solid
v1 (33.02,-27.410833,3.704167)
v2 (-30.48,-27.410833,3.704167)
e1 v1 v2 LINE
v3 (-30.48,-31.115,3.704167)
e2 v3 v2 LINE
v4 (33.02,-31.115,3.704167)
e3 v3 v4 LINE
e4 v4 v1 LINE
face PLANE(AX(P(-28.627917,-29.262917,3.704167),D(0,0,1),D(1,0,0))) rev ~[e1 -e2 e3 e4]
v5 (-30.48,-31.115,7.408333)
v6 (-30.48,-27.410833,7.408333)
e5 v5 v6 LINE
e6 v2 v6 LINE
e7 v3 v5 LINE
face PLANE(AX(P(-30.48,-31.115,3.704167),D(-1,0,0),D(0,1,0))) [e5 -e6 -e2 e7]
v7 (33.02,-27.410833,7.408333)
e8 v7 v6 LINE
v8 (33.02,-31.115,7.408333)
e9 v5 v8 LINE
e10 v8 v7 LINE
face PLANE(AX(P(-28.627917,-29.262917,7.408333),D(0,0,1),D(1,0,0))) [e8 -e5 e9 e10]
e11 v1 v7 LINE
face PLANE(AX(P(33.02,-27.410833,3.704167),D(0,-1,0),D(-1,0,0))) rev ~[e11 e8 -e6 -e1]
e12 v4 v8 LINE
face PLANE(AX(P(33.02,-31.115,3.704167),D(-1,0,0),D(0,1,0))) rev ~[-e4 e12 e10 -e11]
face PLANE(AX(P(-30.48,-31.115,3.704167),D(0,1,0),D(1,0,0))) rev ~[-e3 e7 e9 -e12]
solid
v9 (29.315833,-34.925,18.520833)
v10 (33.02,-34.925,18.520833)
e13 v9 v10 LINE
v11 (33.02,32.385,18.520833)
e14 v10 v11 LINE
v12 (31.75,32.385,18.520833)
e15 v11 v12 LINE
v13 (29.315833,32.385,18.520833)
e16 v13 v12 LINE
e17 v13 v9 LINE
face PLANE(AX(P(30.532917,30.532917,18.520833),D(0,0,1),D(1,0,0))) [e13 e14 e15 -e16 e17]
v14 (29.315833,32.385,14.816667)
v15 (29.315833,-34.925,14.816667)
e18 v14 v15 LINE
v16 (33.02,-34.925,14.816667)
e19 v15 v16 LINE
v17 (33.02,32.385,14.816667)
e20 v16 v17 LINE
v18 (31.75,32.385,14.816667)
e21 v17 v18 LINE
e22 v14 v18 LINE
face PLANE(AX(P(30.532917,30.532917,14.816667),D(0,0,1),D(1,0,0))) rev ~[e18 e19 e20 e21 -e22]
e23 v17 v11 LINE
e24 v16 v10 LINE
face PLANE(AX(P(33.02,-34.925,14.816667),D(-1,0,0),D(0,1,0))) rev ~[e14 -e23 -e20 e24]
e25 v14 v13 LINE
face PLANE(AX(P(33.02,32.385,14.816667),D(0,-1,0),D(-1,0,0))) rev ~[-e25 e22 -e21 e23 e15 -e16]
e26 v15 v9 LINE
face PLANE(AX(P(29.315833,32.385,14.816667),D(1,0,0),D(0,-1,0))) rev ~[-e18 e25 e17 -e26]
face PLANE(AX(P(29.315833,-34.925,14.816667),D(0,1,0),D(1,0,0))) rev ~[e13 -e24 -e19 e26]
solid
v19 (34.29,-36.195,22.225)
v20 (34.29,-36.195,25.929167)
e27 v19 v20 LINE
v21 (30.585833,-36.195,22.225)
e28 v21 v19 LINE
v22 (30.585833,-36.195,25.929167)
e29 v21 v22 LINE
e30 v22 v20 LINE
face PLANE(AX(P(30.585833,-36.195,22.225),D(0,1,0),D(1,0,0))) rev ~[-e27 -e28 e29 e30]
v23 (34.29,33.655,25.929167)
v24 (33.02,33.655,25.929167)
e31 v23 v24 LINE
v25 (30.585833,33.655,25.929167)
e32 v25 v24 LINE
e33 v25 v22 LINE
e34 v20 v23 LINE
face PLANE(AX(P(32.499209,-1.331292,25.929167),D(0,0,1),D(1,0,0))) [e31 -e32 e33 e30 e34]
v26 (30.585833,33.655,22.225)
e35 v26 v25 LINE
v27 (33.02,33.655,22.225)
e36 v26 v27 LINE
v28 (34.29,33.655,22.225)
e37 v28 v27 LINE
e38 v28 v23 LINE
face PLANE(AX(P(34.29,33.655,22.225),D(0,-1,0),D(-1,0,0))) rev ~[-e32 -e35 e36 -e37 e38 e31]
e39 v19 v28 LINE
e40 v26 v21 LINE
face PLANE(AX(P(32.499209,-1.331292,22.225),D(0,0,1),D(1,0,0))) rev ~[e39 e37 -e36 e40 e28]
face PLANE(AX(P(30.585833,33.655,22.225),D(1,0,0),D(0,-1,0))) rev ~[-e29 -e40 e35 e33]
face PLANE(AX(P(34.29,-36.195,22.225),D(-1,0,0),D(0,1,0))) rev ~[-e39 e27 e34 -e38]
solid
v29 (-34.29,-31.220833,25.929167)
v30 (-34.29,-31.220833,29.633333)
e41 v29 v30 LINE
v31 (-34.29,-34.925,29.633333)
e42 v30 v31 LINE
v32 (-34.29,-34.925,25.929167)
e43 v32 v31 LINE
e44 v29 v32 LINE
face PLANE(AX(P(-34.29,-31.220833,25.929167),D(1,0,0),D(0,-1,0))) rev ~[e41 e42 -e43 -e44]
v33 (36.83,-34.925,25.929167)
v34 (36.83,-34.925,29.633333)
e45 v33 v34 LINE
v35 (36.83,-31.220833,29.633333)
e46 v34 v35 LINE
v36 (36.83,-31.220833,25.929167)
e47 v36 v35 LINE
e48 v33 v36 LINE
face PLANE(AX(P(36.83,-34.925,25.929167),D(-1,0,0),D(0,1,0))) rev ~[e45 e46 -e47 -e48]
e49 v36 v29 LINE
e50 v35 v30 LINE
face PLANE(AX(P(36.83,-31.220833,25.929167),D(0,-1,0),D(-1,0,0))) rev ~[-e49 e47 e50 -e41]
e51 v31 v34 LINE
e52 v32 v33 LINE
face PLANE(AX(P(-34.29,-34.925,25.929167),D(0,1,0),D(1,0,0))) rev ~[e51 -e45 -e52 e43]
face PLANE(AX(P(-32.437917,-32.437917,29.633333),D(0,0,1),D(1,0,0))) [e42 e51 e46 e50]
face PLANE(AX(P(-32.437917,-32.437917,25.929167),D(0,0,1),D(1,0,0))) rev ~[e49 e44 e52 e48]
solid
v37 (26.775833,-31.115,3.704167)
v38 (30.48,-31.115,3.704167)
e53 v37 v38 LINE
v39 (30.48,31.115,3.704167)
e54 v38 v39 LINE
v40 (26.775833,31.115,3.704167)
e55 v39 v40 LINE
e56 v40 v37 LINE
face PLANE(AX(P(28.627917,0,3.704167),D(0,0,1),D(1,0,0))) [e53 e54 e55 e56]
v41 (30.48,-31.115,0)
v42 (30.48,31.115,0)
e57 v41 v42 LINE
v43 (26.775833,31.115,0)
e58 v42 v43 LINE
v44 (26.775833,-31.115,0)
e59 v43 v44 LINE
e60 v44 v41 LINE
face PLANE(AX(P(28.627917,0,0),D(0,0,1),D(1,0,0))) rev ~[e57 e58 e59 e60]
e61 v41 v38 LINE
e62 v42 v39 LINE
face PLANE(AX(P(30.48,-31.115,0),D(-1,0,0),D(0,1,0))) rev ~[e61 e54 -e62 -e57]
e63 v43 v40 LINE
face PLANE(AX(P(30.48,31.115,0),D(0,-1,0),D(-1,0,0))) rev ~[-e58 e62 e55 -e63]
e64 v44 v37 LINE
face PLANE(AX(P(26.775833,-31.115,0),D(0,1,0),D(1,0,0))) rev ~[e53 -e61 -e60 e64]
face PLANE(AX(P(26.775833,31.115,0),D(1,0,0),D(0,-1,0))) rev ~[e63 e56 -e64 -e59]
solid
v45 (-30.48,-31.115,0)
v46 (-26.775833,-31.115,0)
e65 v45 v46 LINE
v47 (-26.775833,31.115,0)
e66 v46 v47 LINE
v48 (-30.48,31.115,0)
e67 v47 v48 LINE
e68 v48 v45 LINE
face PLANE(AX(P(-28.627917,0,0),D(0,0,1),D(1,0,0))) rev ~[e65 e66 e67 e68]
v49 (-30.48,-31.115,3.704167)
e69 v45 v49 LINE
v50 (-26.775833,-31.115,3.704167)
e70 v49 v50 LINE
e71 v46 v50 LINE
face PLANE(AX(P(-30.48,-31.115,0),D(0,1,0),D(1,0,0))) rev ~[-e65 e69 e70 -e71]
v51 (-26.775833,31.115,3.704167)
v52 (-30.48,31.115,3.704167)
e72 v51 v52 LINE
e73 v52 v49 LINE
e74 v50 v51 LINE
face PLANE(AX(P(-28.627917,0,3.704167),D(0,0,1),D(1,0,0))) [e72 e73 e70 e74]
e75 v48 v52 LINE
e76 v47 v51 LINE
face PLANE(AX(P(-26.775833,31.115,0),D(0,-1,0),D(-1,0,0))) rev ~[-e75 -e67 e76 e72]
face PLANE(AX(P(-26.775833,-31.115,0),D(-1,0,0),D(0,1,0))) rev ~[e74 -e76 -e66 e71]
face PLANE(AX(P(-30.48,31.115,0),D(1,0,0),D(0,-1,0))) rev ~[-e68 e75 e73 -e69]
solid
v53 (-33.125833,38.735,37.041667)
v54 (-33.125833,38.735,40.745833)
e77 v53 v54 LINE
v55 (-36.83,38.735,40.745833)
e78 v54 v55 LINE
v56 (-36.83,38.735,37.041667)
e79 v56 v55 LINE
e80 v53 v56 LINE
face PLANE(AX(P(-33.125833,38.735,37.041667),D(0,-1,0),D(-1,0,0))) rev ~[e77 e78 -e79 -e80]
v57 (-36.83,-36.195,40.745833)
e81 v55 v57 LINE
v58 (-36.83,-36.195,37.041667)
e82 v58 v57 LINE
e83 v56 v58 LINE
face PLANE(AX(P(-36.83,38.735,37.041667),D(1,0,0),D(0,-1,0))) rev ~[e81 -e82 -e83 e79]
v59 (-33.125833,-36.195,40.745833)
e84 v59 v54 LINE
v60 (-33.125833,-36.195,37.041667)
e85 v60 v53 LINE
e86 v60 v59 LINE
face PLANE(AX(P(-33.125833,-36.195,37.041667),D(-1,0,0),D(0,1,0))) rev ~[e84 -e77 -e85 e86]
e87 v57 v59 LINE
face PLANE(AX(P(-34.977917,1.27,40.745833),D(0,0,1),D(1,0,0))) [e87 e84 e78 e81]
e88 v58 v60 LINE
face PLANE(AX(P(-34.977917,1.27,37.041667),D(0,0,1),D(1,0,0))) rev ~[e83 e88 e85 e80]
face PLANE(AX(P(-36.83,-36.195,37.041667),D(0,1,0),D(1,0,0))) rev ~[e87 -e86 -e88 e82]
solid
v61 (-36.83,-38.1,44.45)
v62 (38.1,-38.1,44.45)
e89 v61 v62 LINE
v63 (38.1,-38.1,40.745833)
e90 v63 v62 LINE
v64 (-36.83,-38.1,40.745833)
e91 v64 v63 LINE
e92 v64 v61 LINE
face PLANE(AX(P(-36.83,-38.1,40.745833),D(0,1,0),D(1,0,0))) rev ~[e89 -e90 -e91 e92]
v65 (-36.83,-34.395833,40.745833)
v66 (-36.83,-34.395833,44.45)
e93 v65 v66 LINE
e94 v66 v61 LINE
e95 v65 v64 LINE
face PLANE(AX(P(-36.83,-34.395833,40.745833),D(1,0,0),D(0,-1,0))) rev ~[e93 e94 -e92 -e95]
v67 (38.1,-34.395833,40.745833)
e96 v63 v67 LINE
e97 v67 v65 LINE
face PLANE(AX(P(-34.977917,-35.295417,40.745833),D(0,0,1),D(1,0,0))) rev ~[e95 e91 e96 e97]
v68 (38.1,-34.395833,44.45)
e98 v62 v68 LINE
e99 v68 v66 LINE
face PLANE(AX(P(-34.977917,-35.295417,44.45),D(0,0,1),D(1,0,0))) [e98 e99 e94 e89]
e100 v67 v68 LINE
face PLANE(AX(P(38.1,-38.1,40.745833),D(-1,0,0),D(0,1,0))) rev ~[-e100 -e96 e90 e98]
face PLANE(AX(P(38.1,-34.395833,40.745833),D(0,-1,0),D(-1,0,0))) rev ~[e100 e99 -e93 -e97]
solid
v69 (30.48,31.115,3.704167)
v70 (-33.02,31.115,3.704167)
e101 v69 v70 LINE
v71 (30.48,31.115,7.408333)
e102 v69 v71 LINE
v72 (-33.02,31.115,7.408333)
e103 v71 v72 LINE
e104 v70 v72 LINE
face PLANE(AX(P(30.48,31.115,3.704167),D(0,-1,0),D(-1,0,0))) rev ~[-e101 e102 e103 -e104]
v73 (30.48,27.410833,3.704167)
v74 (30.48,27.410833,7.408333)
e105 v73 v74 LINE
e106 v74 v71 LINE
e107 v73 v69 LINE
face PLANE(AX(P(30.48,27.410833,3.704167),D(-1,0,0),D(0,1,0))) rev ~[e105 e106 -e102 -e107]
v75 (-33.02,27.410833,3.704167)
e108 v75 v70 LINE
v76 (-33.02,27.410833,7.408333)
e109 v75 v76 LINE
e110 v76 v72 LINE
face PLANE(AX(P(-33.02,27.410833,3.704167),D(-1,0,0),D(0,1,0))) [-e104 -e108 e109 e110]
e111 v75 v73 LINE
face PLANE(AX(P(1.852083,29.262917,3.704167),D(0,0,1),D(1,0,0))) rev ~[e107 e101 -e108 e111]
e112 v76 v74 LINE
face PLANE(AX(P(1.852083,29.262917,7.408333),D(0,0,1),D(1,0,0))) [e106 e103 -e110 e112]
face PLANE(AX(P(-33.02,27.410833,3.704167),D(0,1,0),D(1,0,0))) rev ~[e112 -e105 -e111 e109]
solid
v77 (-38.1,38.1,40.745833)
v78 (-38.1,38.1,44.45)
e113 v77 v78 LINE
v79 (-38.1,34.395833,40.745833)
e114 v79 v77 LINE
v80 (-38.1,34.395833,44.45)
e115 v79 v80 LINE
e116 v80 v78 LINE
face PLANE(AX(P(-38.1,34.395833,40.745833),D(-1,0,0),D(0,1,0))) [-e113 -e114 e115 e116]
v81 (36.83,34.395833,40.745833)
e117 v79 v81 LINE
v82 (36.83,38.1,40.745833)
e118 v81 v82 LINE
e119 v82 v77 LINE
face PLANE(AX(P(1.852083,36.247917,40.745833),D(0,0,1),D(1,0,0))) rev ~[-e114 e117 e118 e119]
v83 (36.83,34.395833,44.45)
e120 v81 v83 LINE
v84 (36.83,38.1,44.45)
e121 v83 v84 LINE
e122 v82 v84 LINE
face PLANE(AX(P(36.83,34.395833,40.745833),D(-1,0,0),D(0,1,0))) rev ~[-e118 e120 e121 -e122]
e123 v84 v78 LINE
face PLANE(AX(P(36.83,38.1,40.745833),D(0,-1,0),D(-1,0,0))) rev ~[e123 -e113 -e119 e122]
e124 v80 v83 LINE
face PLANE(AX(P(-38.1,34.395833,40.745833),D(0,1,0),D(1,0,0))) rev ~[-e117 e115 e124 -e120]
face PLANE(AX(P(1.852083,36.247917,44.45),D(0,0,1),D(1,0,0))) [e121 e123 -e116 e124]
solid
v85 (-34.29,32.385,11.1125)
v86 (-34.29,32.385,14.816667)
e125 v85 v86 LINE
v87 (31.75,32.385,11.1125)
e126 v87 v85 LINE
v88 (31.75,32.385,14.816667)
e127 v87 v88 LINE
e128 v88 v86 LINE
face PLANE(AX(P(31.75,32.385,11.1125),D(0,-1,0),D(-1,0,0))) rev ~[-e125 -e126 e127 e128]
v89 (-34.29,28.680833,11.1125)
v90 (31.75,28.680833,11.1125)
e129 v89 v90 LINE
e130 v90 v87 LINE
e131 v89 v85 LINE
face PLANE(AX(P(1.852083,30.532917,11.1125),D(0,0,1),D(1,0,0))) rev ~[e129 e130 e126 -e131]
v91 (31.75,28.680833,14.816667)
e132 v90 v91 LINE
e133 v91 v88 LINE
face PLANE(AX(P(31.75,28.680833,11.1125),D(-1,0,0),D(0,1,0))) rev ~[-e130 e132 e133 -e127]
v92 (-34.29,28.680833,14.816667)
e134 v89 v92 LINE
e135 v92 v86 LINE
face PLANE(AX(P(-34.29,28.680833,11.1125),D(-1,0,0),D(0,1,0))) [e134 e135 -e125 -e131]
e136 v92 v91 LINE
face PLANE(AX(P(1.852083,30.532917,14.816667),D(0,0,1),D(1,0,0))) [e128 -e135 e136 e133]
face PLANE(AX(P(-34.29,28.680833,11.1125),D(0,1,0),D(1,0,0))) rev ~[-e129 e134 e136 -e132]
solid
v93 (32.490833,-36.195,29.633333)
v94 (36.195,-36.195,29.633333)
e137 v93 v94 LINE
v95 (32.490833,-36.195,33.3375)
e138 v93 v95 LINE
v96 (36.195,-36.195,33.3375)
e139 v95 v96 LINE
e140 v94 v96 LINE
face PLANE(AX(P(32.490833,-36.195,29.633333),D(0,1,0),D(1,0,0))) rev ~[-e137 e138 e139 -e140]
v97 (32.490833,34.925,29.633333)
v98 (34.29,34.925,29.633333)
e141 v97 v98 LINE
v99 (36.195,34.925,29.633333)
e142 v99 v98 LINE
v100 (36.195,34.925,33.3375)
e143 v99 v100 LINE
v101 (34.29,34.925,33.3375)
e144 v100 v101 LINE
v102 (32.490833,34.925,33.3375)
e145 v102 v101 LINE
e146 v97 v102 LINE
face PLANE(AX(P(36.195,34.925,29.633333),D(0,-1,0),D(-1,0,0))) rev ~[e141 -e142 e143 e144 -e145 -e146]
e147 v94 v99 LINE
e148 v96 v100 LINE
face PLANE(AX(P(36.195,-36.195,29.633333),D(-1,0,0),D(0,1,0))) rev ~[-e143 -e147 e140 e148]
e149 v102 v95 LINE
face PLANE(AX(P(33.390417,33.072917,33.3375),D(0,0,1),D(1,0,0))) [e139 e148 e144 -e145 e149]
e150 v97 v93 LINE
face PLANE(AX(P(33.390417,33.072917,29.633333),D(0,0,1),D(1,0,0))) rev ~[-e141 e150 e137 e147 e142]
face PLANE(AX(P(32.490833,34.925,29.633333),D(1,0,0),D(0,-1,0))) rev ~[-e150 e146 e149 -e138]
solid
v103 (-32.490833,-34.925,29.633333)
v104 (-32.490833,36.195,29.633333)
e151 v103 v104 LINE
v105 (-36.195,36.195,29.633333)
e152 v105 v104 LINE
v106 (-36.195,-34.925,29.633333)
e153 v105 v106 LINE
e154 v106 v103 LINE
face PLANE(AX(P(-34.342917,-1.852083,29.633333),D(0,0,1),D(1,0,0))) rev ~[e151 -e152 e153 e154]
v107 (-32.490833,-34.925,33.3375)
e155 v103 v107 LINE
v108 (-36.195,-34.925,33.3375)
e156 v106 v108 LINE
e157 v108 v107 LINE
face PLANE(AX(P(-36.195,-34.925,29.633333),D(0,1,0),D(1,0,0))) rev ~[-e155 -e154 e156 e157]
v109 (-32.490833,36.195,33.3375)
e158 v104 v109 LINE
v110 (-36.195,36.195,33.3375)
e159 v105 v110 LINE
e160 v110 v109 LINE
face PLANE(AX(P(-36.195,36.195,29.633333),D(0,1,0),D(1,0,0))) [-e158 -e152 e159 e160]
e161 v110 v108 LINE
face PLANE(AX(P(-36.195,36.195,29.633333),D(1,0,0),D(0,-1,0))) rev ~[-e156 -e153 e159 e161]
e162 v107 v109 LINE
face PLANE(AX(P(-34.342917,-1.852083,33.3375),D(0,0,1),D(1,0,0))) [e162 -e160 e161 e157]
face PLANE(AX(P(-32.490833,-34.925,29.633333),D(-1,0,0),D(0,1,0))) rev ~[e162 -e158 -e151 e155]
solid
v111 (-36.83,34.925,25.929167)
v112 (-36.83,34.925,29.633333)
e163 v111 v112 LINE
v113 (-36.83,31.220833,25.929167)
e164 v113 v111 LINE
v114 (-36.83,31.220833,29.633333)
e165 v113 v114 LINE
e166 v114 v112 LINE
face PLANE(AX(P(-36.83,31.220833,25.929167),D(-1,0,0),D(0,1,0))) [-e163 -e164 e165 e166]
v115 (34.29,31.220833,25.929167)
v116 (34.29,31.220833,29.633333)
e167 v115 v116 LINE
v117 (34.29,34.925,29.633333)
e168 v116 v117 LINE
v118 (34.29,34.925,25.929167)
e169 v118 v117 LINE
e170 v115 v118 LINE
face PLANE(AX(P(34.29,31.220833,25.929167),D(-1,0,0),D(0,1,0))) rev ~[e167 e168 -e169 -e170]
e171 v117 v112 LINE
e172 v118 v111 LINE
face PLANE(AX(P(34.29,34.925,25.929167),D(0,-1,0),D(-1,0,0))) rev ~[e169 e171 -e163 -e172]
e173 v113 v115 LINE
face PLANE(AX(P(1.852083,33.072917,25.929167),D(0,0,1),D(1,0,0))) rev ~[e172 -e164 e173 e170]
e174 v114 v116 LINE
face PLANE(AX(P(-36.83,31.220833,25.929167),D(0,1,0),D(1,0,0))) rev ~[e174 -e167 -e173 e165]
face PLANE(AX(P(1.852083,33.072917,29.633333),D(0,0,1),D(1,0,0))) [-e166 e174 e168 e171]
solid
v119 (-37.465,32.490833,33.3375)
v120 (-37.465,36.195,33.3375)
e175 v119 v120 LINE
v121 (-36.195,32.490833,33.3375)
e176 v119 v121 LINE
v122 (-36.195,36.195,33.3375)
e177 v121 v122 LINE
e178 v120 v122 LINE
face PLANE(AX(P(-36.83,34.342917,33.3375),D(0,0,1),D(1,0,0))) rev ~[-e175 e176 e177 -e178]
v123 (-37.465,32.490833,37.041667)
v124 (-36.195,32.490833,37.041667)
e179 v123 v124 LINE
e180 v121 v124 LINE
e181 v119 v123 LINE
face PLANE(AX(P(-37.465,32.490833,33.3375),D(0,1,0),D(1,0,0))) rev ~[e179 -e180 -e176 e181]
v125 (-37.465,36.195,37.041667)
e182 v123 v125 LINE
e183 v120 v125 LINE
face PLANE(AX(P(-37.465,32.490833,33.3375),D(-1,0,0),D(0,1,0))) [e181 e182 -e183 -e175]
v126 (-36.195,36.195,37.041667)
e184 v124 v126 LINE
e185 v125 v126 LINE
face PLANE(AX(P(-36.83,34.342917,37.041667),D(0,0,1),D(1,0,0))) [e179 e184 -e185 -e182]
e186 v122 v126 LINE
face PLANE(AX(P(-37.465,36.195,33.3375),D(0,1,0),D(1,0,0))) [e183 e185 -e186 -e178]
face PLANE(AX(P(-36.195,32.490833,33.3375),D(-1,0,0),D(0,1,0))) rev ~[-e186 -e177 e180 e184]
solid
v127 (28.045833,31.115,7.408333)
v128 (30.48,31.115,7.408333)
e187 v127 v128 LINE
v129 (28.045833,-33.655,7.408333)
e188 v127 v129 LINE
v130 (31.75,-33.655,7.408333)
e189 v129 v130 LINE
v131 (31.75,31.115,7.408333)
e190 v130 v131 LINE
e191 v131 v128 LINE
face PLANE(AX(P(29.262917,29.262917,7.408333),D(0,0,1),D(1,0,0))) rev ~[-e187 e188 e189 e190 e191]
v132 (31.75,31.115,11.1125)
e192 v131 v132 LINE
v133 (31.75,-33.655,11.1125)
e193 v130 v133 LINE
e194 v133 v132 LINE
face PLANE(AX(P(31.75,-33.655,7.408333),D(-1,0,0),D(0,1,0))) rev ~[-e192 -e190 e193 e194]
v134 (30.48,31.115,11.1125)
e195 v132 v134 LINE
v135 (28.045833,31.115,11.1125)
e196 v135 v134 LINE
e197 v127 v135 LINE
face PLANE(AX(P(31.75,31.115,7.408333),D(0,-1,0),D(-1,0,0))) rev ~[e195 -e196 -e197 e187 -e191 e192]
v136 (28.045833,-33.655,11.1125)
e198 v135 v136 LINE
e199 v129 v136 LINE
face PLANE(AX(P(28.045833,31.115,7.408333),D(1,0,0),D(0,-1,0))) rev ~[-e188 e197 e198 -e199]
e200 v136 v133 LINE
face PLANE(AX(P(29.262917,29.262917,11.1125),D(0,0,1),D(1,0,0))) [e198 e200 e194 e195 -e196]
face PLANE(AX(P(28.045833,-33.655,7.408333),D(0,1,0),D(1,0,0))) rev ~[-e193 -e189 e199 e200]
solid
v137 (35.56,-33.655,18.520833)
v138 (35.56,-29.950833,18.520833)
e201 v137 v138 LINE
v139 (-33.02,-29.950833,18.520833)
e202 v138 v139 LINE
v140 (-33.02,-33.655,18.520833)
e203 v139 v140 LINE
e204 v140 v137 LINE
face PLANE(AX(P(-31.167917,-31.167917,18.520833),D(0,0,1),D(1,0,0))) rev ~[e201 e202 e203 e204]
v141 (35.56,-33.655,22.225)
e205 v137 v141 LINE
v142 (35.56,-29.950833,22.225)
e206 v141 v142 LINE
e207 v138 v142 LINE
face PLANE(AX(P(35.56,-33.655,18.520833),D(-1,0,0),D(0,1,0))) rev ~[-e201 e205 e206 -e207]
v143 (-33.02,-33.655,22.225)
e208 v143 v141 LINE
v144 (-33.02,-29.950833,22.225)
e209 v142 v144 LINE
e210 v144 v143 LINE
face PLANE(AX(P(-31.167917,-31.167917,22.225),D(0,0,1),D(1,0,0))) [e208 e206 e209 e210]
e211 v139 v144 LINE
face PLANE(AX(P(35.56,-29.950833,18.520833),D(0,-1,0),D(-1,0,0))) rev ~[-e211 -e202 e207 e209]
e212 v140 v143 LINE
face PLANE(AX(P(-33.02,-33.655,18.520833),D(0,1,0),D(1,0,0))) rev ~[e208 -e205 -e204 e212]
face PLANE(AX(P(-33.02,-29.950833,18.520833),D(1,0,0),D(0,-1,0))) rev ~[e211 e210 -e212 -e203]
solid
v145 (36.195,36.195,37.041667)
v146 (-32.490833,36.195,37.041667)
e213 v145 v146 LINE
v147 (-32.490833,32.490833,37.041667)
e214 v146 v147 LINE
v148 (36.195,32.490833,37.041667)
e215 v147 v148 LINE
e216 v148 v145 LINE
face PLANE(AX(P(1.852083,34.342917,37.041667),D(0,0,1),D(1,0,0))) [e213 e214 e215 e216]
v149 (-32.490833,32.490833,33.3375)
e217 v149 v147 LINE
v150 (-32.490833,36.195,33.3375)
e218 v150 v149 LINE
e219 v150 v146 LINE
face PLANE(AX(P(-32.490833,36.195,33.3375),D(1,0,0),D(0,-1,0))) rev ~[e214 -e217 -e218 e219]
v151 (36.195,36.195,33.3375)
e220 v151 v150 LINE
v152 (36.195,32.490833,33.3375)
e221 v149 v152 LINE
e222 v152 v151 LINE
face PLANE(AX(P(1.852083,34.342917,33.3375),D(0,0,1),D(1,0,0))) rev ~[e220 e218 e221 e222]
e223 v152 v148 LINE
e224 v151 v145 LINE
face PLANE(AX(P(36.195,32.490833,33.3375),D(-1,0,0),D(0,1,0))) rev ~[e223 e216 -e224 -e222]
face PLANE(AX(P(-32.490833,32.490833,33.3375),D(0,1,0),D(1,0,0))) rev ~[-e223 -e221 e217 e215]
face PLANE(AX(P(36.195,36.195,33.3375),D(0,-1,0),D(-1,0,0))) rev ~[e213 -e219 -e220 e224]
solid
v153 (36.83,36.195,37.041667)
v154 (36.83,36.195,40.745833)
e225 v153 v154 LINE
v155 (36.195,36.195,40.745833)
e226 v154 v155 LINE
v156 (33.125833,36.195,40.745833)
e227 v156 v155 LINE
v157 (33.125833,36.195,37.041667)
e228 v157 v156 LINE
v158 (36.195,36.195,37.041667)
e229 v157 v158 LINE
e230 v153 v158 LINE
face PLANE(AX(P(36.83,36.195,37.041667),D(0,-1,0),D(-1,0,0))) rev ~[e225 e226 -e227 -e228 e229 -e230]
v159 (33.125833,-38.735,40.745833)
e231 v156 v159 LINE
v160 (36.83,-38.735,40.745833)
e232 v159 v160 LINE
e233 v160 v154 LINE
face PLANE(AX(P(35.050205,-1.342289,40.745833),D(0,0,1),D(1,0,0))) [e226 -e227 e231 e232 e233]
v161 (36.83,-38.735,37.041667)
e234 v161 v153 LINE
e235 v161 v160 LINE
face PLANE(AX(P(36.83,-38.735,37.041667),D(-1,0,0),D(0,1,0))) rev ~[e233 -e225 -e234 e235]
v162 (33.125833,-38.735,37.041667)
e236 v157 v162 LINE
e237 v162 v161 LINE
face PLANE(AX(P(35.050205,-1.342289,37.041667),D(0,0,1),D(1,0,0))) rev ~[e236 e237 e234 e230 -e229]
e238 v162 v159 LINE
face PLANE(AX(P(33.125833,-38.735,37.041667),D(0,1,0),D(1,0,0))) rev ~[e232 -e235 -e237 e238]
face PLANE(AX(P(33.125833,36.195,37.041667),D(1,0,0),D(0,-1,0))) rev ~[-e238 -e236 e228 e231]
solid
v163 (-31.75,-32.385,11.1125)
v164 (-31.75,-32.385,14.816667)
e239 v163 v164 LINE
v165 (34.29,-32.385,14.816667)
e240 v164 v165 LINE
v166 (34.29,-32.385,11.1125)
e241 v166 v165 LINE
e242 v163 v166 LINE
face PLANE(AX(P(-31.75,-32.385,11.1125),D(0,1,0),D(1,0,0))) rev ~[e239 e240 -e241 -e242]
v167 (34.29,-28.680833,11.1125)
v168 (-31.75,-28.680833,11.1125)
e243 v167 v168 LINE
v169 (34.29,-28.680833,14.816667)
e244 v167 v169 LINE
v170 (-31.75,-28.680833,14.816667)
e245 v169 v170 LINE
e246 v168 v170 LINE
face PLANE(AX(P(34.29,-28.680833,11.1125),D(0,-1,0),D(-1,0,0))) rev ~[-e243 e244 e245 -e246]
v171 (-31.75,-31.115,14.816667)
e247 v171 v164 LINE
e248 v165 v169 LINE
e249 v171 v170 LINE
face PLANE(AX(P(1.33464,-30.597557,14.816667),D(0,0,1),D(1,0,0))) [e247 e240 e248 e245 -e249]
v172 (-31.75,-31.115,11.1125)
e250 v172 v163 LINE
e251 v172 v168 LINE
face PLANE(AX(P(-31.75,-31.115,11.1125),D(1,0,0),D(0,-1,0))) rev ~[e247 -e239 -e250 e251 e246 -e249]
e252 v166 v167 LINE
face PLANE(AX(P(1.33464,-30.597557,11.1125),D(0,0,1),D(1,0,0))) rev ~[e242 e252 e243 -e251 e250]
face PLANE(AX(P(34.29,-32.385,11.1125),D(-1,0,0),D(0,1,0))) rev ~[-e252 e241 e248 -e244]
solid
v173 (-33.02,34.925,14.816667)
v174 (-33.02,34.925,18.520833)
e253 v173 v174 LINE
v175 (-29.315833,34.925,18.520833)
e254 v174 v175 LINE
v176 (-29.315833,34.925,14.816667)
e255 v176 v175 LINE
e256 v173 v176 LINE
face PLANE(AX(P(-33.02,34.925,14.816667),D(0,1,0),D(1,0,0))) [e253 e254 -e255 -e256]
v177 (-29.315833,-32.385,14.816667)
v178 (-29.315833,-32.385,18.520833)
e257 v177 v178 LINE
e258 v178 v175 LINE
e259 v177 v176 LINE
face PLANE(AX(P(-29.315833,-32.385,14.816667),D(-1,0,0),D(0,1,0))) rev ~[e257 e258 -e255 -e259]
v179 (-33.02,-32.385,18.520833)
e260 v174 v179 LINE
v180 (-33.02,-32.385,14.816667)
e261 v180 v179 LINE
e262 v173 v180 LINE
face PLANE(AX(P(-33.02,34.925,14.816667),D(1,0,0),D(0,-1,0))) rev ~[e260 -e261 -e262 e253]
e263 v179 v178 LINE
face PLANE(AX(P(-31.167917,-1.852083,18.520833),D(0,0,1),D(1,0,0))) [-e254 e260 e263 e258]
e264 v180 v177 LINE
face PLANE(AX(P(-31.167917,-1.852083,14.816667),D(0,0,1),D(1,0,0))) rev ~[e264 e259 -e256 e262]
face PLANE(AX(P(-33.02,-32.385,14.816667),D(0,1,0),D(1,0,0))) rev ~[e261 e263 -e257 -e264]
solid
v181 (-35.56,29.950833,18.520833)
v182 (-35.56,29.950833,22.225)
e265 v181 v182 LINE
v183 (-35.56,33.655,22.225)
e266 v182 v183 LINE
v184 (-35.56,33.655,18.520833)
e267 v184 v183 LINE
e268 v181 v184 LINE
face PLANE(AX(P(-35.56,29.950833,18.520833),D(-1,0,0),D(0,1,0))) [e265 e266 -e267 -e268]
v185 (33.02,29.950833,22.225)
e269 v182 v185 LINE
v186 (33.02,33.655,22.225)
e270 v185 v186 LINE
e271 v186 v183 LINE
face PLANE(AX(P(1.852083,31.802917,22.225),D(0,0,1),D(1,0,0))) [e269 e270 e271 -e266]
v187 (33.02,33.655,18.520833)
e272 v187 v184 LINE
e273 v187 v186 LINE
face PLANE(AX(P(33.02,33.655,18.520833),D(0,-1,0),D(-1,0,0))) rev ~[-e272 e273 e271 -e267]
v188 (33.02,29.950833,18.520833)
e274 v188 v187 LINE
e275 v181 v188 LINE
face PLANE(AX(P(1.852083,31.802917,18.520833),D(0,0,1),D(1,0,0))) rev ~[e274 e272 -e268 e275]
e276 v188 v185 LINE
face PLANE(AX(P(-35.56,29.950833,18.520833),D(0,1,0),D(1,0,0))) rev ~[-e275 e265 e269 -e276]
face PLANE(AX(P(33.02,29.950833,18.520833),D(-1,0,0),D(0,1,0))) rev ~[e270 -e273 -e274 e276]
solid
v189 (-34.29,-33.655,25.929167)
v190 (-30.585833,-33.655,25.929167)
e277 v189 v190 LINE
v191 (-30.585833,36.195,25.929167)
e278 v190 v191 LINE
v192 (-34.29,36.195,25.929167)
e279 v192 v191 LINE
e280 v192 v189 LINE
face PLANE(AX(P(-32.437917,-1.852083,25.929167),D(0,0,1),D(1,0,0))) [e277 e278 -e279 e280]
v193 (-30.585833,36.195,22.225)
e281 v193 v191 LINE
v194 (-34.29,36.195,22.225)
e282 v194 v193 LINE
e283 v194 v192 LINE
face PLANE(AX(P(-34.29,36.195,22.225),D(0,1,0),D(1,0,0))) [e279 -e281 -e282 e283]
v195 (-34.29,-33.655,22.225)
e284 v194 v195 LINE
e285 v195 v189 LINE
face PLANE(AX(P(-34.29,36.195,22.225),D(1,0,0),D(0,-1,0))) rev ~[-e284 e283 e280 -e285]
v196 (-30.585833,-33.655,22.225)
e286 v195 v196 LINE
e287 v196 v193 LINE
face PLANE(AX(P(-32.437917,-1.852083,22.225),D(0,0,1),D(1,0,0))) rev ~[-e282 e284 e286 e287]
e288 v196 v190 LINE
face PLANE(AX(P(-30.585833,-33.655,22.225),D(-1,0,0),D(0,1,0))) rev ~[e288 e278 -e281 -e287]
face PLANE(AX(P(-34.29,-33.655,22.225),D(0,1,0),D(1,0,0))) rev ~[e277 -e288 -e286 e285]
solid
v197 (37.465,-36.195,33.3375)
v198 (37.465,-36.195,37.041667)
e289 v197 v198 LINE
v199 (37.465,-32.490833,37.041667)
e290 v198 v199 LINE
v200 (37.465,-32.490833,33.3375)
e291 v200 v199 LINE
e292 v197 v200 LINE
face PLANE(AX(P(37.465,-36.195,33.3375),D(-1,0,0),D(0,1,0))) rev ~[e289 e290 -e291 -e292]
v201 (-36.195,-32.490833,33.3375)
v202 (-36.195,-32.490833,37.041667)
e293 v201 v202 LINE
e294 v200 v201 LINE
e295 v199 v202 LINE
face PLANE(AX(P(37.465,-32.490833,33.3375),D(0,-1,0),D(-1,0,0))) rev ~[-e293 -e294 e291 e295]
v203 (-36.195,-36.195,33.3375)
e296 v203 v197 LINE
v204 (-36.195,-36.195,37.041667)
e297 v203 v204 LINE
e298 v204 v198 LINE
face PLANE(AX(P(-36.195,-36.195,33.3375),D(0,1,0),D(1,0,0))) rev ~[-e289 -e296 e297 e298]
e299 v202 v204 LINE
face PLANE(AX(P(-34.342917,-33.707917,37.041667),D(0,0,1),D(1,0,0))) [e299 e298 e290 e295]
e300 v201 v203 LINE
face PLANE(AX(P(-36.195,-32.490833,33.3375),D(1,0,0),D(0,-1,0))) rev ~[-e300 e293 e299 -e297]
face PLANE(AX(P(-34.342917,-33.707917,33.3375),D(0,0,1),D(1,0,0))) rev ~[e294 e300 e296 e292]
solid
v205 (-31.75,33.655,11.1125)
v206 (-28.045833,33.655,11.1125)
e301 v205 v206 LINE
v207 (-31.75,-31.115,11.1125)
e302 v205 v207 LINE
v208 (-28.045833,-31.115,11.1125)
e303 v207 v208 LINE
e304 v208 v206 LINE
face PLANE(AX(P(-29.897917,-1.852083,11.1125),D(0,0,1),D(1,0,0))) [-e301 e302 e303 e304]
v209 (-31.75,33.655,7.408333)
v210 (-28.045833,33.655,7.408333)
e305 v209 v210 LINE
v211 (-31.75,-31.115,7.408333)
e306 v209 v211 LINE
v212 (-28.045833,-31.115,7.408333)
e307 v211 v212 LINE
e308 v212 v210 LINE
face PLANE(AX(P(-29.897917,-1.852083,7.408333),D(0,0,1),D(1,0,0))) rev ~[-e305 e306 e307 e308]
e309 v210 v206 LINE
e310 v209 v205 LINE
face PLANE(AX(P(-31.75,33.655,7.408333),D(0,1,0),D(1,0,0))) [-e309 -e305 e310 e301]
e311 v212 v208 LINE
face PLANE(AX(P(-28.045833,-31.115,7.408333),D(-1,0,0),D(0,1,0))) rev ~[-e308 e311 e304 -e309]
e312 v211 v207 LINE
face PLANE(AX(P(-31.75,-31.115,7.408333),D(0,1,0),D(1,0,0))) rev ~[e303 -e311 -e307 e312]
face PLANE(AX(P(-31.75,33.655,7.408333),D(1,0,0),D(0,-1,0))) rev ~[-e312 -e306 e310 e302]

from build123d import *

# Parameters (mm, degrees)
F1_DEPTH  = 3.7041666667
F2_W      = 2.54
F2_H      = 3.7041666667
F2_W_2    = 3.7041666667
F3_DEPTH  = 3.7041666667
F4_W      = 3.7041666667
F4_H      = 2.54
F4_H_2    = 3.7041666667
F5_DEPTH  = 3.7041666667
F4_W_2    = 2.4341666667
F6_W      = 3.7041666667
F6_H      = 2.4341666667
F7_DEPTH  = 3.7041666667
F6_H_2    = 3.7041666667
F6_W_2    = 2.54
F8_W      = 3.7041666667
F8_H      = 2.54
F8_H_2    = 3.7041666667
F9_DEPTH  = 3.7041666667
F8_W_2    = 2.4341666667
F10_W     = 3.7041666667
F10_H     = 3.7041666667
F10_W_2   = 2.54
F11_DEPTH = 3.7041666667
F10_H_2   = 2.4341666667
F12_W     = 3.7041666667
F12_H     = 3.7041666667
F12_H_2   = 2.54
F13_DEPTH = 3.7041666667
F12_W_2   = 2.4341666667
F14_W     = 3.7041666667
F14_H     = 3.7041666667
F14_W_2   = 2.54
F15_DEPTH = 3.7041666667
F14_H_2   = 2.4341666667
F16_W     = 3.7041666667
F16_H     = 3.7041666667
F16_H_2   = 1.27
F17_DEPTH = 3.7041666667
F16_W_2   = 1.7991666667
F18_W     = 1.27
F18_H     = 3.7041666667
F19_DEPTH = 3.7041666667
F18_W_2   = 3.7041666667
F18_H_2   = 2.4341666667
F21_DEPTH = 3.7041666667
F20_W     = 3.0691666667
F20_H     = 3.7041666667
F22_W     = 1.27
F22_H     = 3.7041666667
F22_W_2   = 3.7041666667
F23_DEPTH = 3.7041666667
F22_H_2   = 1.7991666667


# Not quite as in the source:
# - a feature names something its author has since deleted; it is built from what else it names


with BuildPart() as f1:
    # F0 (on Top) → F1 (new body)
    with BuildSketch(Plane.XY):
        Polygon((30.48, 31.115), (26.7758333333, 31.115), (26.7758333333, -6.985), (26.7758333333, -31.115), (30.48, -31.115), align=None)
    extrude(amount=F1_DEPTH)


with BuildPart() as f1b:
    # F0 (on Top) → F1, piece 2 (new body)
    with BuildSketch(Plane.XY):
        Polygon((-26.7758333333, -31.115), (-26.7758333333, 6.985), (-26.7758333333, 31.115), (-30.48, 31.115), (-30.48, -31.115), align=None)
    extrude(amount=F1_DEPTH)


with BuildPart() as f3:
    # F2 (on face) → F3 (new body)
    with BuildSketch(Plane.XY.offset(3.7041666667)):
        Polygon((-26.7758333333, 31.115), (-26.7758333333, 27.4108333333), (0, 27.4108333333), (30.48, 27.4108333333), (30.48, 31.115), align=None)
        with Locations((-31.75, 29.2629166667)):
            Rectangle(F2_W, F2_H)
        with Locations((-28.6279166667, 29.2629166667)):
            Rectangle(F2_W_2, F2_H)
    extrude(amount=F3_DEPTH)


with BuildPart() as f3b:
    # F2 (on face) → F3, piece 2 (new body)
    with BuildSketch(Plane.XY.offset(3.7041666667)):
        with Locations((-28.6279166667, -29.2629166667)):
            Rectangle(F2_W_2, F2_H)
        Polygon((-26.7758333333, -27.4108333333), (-26.7758333333, -31.115), (33.02, -31.115), (33.02, -27.4108333333), (0, -27.4108333333), align=None)
    extrude(amount=F3_DEPTH)


with BuildPart() as f5:
    # F4 (on face) → F5 (new body)
    with BuildSketch(Plane.XY.offset(7.4083333333)):
        Polygon((-28.0458333333, 27.4108333333), (-31.75, 27.4108333333), (-31.75, -31.115), (-28.0458333333, -31.115), (-28.0458333333, 0), align=None)
        with Locations((-29.8979166667, 32.385)):
            Rectangle(F4_W, F4_H)
        with Locations((-29.8979166667, 29.2629166667)):
            Rectangle(F4_W, F4_H_2)
    extrude(amount=F5_DEPTH)


with BuildPart() as f5b:
    # F4 (on face) → F5, piece 2 (new body)
    with BuildSketch(Plane.XY.offset(7.4083333333)):
        with Locations((29.2629166667, 29.2629166667)):
            Rectangle(F4_W_2, F4_H_2)
        Polygon((30.48, 27.4108333333), (28.0458333333, 27.4108333333), (28.0458333333, 0), (28.0458333333, -33.655), (31.75, -33.655), (31.75, 31.115), (30.48, 31.115), align=None)
    extrude(amount=F5_DEPTH)


with BuildPart() as f7:
    # F6 (on face) → F7 (new body)
    with BuildSketch(Plane.XY.offset(11.1125)):
        Polygon((0, -28.6808333333), (-28.0458333333, -28.6808333333), (-28.0458333333, -31.115), (-31.75, -31.115), (-31.75, -32.385), (34.29, -32.385), (34.29, -28.6808333333), align=None)
        with Locations((-29.8979166667, -29.8979166667)):
            Rectangle(F6_W, F6_H)
    extrude(amount=F7_DEPTH)


with BuildPart() as f7b:
    # F6 (on face) → F7, piece 2 (new body)
    with BuildSketch(Plane.XY.offset(11.1125)):
        Polygon((31.75, 32.385), (-28.0458333333, 32.385), (-28.0458333333, 28.6808333333), (0, 28.6808333333), (31.75, 28.6808333333), align=None)
        with Locations((-29.8979166667, 30.5329166667)):
            Rectangle(F6_W, F6_H_2)
        with Locations((-33.02, 30.5329166667)):
            Rectangle(F6_W_2, F6_H_2)
    extrude(amount=F7_DEPTH)


with BuildPart() as f9:
    # F8 (on face) → F9 (new body)
    with BuildSketch(Plane.XY.offset(14.8166666667)):
        Polygon((-29.3158333333, -32.385), (-29.3158333333, 0), (-29.3158333333, 28.6808333333), (-33.02, 28.6808333333), (-33.02, -32.385), align=None)
        with Locations((-31.1679166667, 33.655)):
            Rectangle(F8_W, F8_H)
        with Locations((-31.1679166667, 30.5329166667)):
            Rectangle(F8_W, F8_H_2)
    extrude(amount=F9_DEPTH)


with BuildPart() as f9b:
    # F8 (on face) → F9, piece 2 (new body)
    with BuildSketch(Plane.XY.offset(14.8166666667)):
        with Locations((30.5329166667, 30.5329166667)):
            Rectangle(F8_W_2, F8_H_2)
        Polygon((29.3158333333, -34.925), (33.02, -34.925), (33.02, 32.385), (31.75, 32.385), (31.75, 28.6808333333), (29.3158333333, 28.6808333333), (29.3158333333, 0), align=None)
    extrude(amount=F9_DEPTH)


with BuildPart() as f11:
    # F10 (on face) → F11 (new body)
    with BuildSketch(Plane.XY.offset(18.5208333333)):
        Polygon((-29.3158333333, 29.9508333333), (0, 29.9508333333), (33.02, 29.9508333333), (33.02, 33.655), (-29.3158333333, 33.655), align=None)
        with Locations((-31.1679166667, 31.8029166667)):
            Rectangle(F10_W, F10_H)
        with Locations((-34.29, 31.8029166667)):
            Rectangle(F10_W_2, F10_H)
    extrude(amount=F11_DEPTH)


with BuildPart() as f11b:
    # F10 (on face) → F11, piece 2 (new body)
    with BuildSketch(Plane.XY.offset(18.5208333333)):
        with Locations((-31.1679166667, -31.1679166667)):
            Rectangle(F10_W, F10_H_2)
        Polygon((35.56, -29.9508333333), (0, -29.9508333333), (-29.3158333333, -29.9508333333), (-29.3158333333, -32.385), (-33.02, -32.385), (-33.02, -33.655), (35.56, -33.655), align=None)
    extrude(amount=F11_DEPTH)


with BuildPart() as f13:
    # F12 (on face) → F13 (new body)
    with BuildSketch(Plane.XY.offset(22.225)):
        Polygon((-30.5858333333, -33.655), (-30.5858333333, 0), (-30.5858333333, 29.9508333333), (-34.29, 29.9508333333), (-34.29, -33.655), align=None)
        with Locations((-32.4379166667, 31.8029166667)):
            Rectangle(F12_W, F12_H)
        with Locations((-32.4379166667, 34.925)):
            Rectangle(F12_W, F12_H_2)
    extrude(amount=F13_DEPTH)


with BuildPart() as f13b:
    # F12 (on face) → F13, piece 2 (new body)
    with BuildSketch(Plane.XY.offset(22.225)):
        Polygon((34.29, -36.195), (34.29, 33.655), (33.02, 33.655), (33.02, 29.9508333333), (30.5858333333, 29.9508333333), (30.5858333333, 0), (30.5858333333, -36.195), align=None)
        with Locations((31.8029166667, 31.8029166667)):
            Rectangle(F12_W_2, F12_H)
    extrude(amount=F13_DEPTH)


with BuildPart() as f15:
    # F14 (on face) → F15 (new body)
    with BuildSketch(Plane.XY.offset(25.9291666667)):
        Polygon((34.29, 34.925), (-30.5858333333, 34.925), (-30.5858333333, 31.2208333333), (0, 31.2208333333), (34.29, 31.2208333333), align=None)
        with Locations((-32.4379166667, 33.0729166667)):
            Rectangle(F14_W, F14_H)
        with Locations((-35.56, 33.0729166667)):
            Rectangle(F14_W_2, F14_H)
    extrude(amount=F15_DEPTH)


with BuildPart() as f15b:
    # F14 (on face) → F15, piece 2 (new body)
    with BuildSketch(Plane.XY.offset(25.9291666667)):
        with Locations((-32.4379166667, -32.4379166667)):
            Rectangle(F14_W, F14_H_2)
        Polygon((0, -31.2208333333), (-30.5858333333, -31.2208333333), (-30.5858333333, -33.655), (-34.29, -33.655), (-34.29, -34.925), (36.83, -34.925), (36.83, -31.2208333333), align=None)
    extrude(amount=F15_DEPTH)


with BuildPart() as f17:
    # F16 (on face) → F17 (new body)
    with BuildSketch(Plane.XY.offset(29.6333333333)):
        Polygon((-32.4908333333, -34.925), (-32.4908333333, 0), (-32.4908333333, 31.2208333333), (-36.195, 31.2208333333), (-36.195, -34.925), align=None)
        with Locations((-34.3429166667, 33.0729166667)):
            Rectangle(F16_W, F16_H)
        with Locations((-34.3429166667, 35.56)):
            Rectangle(F16_W, F16_H_2)
    extrude(amount=F17_DEPTH)


with BuildPart() as f17b:
    # F16 (on face) → F17, piece 2 (new body)
    with BuildSketch(Plane.XY.offset(29.6333333333)):
        with Locations((33.3904166667, 33.0729166667)):
            Rectangle(F16_W_2, F16_H)
        Polygon((36.195, -36.195), (36.195, 34.925), (34.29, 34.925), (34.29, 31.2208333333), (32.4908333333, 31.2208333333), (32.4908333333, 0), (32.4908333333, -36.195), align=None)
    extrude(amount=F17_DEPTH)


with BuildPart() as f19:
    # F18 (on face) → F19 (new body)
    with BuildSketch(Plane.XY.offset(33.3375)):
        with Locations((-36.83, 34.3429166667)):
            Rectangle(F18_W, F18_H)
    extrude(amount=F19_DEPTH)


with BuildPart() as f19b:
    # F18 (on face) → F19, piece 2 (new body)
    with BuildSketch(Plane.XY.offset(33.3375)):
        Polygon((36.195, 36.195), (-32.4908333333, 36.195), (-32.4908333333, 32.4908333333), (0, 32.4908333333), (36.195, 32.4908333333), align=None)
    extrude(amount=F19_DEPTH)


with BuildPart() as f19c:
    # F18 (on face) → F19, piece 3 (new body)
    with BuildSketch(Plane.XY.offset(33.3375)):
        with Locations((-34.3429166667, -33.7079166667)):
            Rectangle(F18_W_2, F18_H_2)
        Polygon((0, -32.4908333333), (-32.4908333333, -32.4908333333), (-32.4908333333, -34.925), (-36.195, -34.925), (-36.195, -36.195), (37.465, -36.195), (37.465, -32.4908333333), align=None)
    extrude(amount=F19_DEPTH)


with BuildPart() as f21:
    # F20 (on face) → F21 (new body)
    with BuildSketch(Plane.XY.offset(37.0416666667)):
        Polygon((-33.1258333333, -36.195), (-33.1258333333, 0), (-33.1258333333, 38.735), (-36.83, 38.735), (-36.83, -36.195), align=None)
    extrude(amount=F21_DEPTH)


with BuildPart() as f21b:
    # F20 (on face) → F21, piece 2 (new body)
    with BuildSketch(Plane.XY.offset(37.0416666667)):
        Polygon((36.83, -38.735), (36.83, 36.195), (36.195, 36.195), (36.195, 32.4908333333), (33.1258333333, 32.4908333333), (33.1258333333, 0), (33.1258333333, -38.735), align=None)
        with Locations((34.6604166667, 34.3429166667)):
            Rectangle(F20_W, F20_H)
    extrude(amount=F21_DEPTH)


with BuildPart() as f23:
    # F22 (on face) → F23 (new body)
    with BuildSketch(Plane.XY.offset(40.7458333333)):
        Polygon((-33.1258333333, 34.3958333333), (0, 34.3958333333), (36.83, 34.3958333333), (36.83, 38.1), (-33.1258333333, 38.1), align=None)
        with Locations((-37.465, 36.2479166667)):
            Rectangle(F22_W, F22_H)
        with Locations((-34.9779166667, 36.2479166667)):
            Rectangle(F22_W_2, F22_H)
    extrude(amount=F23_DEPTH)


with BuildPart() as f23b:
    # F22 (on face) → F23, piece 2 (new body)
    with BuildSketch(Plane.XY.offset(40.7458333333)):
        with Locations((-34.9779166667, -35.2954166667)):
            Rectangle(F22_W_2, F22_H_2)
        Polygon((38.1, -34.3958333333), (0, -34.3958333333), (-33.1258333333, -34.3958333333), (-33.1258333333, -36.195), (-36.83, -36.195), (-36.83, -38.1), (38.1, -38.1), align=None)
    extrude(amount=F23_DEPTH)


solid = Compound([f1.part, f1b.part, f3.part, f3b.part, f5.part, f5b.part, f7.part, f7b.part, f9.part, f9b.part, f11.part, f11b.part, f13.part, f13b.part, f15.part, f15b.part, f17.part, f17b.part, f19.part, f19b.part, f19c.part, f21.part, f21b.part, f23.part, f23b.part])
